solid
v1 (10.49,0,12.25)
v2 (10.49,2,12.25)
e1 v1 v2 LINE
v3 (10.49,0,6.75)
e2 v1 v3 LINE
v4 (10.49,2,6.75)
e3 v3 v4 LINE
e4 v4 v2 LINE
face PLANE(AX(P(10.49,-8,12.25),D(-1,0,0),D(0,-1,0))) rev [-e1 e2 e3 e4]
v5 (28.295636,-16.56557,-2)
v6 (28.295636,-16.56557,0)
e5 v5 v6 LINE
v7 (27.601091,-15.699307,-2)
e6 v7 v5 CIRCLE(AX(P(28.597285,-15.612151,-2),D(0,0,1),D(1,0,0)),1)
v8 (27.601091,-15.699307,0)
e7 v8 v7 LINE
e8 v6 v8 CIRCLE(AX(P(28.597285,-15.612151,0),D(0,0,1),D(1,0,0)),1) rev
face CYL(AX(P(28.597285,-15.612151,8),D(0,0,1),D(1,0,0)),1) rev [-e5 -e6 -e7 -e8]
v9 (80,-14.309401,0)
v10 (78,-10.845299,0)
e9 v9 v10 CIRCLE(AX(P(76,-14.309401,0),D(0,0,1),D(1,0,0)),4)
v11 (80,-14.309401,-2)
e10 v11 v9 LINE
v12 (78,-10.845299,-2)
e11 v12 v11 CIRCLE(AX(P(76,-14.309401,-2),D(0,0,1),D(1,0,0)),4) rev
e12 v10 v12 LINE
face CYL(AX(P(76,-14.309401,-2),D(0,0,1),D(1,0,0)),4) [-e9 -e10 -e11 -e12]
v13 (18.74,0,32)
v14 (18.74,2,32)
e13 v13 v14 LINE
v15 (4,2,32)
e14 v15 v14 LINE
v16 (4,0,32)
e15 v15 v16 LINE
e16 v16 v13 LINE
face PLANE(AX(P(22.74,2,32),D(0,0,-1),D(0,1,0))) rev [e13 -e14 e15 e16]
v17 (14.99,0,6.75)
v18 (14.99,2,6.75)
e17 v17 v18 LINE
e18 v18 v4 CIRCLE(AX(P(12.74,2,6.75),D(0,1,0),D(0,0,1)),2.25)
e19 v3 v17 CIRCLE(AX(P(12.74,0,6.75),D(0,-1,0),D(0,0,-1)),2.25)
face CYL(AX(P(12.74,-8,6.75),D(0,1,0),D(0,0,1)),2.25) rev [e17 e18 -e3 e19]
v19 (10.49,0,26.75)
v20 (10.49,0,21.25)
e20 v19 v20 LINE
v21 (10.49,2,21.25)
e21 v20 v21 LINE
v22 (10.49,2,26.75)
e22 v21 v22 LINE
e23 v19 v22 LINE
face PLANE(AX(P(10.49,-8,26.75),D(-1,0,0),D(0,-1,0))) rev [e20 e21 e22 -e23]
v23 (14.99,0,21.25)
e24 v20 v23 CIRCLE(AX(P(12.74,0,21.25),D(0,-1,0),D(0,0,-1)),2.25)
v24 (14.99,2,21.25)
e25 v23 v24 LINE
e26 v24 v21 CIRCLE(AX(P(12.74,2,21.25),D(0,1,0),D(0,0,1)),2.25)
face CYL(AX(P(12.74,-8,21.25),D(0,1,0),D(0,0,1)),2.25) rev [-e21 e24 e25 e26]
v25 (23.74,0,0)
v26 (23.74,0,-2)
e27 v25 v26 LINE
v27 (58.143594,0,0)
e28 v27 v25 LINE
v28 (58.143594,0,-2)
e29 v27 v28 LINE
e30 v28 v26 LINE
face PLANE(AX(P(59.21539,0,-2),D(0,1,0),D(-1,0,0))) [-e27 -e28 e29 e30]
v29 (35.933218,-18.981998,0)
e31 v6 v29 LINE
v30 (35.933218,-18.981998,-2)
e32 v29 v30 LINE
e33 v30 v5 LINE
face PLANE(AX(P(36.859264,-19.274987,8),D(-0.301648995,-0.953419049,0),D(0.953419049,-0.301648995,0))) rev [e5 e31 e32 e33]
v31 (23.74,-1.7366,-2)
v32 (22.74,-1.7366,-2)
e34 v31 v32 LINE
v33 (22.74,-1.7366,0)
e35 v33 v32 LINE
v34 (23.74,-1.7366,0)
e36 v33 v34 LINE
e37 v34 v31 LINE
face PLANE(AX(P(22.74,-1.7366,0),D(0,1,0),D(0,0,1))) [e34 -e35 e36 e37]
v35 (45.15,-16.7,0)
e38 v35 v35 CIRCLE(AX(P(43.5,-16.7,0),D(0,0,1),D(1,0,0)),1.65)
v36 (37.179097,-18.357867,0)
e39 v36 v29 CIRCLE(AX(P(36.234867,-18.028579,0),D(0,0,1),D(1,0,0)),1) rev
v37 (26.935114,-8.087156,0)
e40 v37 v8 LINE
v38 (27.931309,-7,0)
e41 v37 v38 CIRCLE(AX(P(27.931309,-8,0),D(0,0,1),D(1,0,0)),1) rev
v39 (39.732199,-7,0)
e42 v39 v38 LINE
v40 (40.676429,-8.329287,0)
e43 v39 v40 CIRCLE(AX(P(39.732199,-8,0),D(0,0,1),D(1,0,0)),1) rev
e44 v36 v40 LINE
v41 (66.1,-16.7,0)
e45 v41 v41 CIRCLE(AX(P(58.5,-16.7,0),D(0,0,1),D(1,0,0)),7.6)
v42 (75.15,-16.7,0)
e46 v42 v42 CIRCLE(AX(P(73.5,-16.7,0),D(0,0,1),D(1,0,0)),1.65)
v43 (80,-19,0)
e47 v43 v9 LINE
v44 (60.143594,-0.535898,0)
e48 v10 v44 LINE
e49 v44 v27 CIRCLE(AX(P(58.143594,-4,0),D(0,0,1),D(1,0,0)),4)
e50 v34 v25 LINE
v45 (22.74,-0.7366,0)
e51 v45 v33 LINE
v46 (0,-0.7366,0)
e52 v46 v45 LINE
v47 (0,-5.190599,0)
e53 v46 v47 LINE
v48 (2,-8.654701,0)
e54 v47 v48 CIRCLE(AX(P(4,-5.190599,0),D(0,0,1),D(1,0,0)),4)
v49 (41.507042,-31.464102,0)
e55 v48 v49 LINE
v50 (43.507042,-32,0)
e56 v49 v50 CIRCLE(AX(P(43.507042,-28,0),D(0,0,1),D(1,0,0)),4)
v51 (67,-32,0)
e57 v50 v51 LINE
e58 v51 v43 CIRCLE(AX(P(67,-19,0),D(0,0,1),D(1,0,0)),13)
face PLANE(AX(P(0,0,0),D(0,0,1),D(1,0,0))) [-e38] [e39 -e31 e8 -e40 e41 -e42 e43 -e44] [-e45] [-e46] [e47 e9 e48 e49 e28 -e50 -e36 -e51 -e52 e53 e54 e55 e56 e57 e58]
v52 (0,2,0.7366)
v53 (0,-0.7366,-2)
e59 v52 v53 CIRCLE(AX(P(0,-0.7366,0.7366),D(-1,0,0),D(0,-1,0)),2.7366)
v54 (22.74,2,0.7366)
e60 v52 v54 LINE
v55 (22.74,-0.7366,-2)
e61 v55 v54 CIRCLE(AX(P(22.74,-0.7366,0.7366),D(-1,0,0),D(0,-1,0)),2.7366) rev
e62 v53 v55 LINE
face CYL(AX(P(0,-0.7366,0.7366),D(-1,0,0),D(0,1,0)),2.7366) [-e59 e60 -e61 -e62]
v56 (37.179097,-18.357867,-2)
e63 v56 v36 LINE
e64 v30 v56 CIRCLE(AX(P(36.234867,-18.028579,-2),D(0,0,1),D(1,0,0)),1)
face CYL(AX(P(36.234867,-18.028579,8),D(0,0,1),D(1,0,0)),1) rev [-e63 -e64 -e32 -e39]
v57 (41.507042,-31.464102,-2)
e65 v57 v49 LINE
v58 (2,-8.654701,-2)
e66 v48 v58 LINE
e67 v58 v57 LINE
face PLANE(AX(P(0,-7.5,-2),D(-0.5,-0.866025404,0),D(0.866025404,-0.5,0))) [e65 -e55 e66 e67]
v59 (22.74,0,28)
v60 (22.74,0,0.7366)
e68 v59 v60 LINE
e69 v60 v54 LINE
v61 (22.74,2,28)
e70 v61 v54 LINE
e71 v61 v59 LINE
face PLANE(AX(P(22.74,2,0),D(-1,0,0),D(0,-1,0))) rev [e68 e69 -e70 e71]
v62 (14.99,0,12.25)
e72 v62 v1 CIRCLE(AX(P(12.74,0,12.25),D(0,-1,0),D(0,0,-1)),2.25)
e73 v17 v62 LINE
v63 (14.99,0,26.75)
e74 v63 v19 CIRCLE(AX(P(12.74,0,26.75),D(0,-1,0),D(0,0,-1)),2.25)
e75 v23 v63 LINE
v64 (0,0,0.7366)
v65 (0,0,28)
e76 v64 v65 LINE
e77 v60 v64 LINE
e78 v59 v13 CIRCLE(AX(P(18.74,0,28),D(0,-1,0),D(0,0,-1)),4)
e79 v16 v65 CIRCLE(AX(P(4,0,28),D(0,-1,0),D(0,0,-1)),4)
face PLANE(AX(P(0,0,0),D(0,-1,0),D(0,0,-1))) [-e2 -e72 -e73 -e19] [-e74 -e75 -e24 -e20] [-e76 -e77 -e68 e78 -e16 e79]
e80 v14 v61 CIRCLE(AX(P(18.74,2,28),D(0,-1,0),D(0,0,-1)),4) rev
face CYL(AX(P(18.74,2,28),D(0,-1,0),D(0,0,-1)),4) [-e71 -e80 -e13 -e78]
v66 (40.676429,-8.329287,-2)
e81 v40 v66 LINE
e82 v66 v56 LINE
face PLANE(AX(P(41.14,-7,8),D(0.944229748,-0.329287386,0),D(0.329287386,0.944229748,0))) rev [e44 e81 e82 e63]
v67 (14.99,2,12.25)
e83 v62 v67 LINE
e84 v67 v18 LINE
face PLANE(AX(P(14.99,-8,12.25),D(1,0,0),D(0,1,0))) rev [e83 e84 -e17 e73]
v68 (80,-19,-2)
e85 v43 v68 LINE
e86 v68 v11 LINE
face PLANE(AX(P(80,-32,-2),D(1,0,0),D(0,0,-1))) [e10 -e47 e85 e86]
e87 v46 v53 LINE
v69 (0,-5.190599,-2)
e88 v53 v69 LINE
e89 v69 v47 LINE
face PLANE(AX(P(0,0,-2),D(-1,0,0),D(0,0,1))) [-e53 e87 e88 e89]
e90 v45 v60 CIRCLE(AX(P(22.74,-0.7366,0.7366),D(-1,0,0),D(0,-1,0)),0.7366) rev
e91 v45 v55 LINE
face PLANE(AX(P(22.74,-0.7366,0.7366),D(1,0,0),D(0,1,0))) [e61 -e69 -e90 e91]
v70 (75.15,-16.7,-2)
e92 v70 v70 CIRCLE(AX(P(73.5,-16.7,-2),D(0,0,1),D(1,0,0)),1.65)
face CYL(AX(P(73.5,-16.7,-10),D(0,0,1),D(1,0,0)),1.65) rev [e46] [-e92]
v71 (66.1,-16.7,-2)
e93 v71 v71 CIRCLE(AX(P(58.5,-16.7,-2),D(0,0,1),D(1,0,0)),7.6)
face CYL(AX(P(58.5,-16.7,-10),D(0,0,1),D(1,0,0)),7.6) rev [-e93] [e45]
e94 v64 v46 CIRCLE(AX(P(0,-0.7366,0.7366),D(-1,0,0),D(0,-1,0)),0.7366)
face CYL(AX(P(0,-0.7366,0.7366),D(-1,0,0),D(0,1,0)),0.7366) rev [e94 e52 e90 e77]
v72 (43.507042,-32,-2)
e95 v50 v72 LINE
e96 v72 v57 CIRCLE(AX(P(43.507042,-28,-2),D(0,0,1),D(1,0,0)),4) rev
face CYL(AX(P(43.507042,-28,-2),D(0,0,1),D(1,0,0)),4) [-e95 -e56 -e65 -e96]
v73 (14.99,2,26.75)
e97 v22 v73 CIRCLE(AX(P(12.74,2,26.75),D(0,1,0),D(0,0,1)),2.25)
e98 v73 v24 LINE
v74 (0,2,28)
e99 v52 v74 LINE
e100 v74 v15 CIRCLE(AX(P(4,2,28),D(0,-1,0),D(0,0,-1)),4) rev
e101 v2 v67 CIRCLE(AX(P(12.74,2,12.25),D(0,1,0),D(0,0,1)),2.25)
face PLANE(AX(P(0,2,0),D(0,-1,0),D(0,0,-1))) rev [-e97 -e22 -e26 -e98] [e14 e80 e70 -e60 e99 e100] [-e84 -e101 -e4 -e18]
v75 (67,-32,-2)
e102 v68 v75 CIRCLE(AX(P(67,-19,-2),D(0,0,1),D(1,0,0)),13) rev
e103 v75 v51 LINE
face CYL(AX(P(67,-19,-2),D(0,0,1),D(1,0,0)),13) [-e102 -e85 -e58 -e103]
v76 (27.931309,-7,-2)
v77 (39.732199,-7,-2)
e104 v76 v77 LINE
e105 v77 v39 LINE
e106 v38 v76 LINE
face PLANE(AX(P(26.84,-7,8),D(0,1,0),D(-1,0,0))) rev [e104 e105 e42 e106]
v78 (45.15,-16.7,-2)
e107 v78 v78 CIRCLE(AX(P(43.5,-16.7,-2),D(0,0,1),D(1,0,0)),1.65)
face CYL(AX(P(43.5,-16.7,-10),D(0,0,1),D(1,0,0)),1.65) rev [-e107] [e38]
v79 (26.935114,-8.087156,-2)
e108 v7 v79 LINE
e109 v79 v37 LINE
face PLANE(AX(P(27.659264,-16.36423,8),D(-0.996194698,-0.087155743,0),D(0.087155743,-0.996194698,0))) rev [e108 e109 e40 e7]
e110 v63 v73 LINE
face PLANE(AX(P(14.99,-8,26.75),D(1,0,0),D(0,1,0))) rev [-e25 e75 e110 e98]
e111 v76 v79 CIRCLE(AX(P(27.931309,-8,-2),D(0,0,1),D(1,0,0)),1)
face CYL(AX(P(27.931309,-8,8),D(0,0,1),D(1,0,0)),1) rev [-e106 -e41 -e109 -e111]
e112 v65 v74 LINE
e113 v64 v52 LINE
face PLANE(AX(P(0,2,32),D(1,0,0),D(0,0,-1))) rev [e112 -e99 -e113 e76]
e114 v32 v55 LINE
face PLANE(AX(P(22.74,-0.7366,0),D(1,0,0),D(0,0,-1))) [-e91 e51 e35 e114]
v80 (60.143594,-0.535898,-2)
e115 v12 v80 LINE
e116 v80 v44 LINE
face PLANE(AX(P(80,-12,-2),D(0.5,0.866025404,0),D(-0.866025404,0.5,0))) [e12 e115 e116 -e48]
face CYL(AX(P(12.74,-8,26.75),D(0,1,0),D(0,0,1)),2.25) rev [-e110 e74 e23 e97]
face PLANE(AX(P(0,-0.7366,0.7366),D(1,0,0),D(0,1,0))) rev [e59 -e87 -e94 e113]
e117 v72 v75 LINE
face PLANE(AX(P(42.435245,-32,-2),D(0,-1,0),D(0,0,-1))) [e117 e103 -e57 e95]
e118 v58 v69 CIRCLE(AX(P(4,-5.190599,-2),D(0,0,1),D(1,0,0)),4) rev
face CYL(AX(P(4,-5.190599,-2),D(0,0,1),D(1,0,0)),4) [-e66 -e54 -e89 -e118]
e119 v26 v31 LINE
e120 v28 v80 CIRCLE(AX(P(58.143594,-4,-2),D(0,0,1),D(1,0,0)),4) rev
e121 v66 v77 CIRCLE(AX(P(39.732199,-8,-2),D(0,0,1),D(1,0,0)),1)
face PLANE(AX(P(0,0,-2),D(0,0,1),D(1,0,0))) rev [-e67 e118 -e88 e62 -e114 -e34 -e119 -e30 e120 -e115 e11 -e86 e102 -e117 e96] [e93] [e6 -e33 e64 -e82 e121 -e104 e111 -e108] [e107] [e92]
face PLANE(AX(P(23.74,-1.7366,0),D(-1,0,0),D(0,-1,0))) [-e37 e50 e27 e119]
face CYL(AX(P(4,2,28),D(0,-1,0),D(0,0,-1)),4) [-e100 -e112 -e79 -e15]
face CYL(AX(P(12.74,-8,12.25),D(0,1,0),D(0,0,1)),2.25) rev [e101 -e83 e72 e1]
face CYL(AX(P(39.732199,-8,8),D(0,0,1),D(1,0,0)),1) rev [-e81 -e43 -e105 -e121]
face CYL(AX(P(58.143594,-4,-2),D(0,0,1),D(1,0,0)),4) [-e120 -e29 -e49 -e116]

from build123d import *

# Parameters (mm, degrees)
SM_BASE_FLANGE_1_DEPTH            = 2
SKETCH_6_R                        = 7.6
SKETCH_6_R_2                      = 1.65
CUT_EXTRUDE_1_DEPTH               = 10
SM_EDGE_FLANGE_1_STRIP_W          = 9.4732
SM_EDGE_FLANGE_1_STRIP_H          = 2
SM_EDGE_FLANGE_1_STRIP_CUT_DEPTH  = 22.74
SM_EDGE_FLANGE_1_RELIEF_W         = 10.4732
SM_EDGE_FLANGE_1_RELIEF_H         = 1
SM_EDGE_FLANGE_1_RELIEF_CUT_DEPTH = 2
SM_EDGE_FLANGE_1_DEPTH            = 22.74
CUT_EXTRUDE_2_DEPTH               = 10
FILLET_1_R                        = 4
CUT_EXTRUDE_3_DEPTH               = 10
FILLET_2_R                        = 1
FILLET_3_R                        = 13


# Sheet-metal steps are written as plain solids
with BuildPart() as part:
    # Sketch 1 → 基体-法兰1 (new body)
    with BuildSketch(Plane.XY):
        Polygon((0, 0), (0, -7.5), (42.435244785, -32), (80, -32), (80, -12), (59.215390309, 0), align=None)
    extrude(amount=-SM_BASE_FLANGE_1_DEPTH)

    # 草图6 → 切除-拉伸1 (cut)
    with BuildSketch(Plane.XY):
        with Locations((58.5, -16.7)):
            Circle(SKETCH_6_R)
        with Locations((73.5, -16.7)):
            Circle(SKETCH_6_R_2)
        with Locations((43.5, -16.7)):
            Circle(SKETCH_6_R_2)
    extrude(amount=-CUT_EXTRUDE_1_DEPTH, mode=Mode.SUBTRACT)

    # 边线-法兰1 strip (across the edge) → 边线-法兰1 strip cut (cut)
    with BuildSketch(Plane(origin=(22.74, 0, 0), x_dir=(0, -1, 0), z_dir=(-1, 0, 0))):
        with Locations((-4, -1)):
            Rectangle(SM_EDGE_FLANGE_1_STRIP_W, SM_EDGE_FLANGE_1_STRIP_H)
    extrude(amount=SM_EDGE_FLANGE_1_STRIP_CUT_DEPTH, mode=Mode.SUBTRACT)

    # 边线-法兰1 relief (on the sheet) → 边线-法兰1 relief cut (cut)
    with BuildSketch(Plane(origin=(22.74, -0.7366, 0), x_dir=(0, -1, 0), z_dir=(0, 0, 1))):
        with Locations((-4.2366, 0.5)):
            Rectangle(SM_EDGE_FLANGE_1_RELIEF_W, SM_EDGE_FLANGE_1_RELIEF_H)
    extrude(amount=-SM_EDGE_FLANGE_1_RELIEF_CUT_DEPTH, mode=Mode.SUBTRACT)

    # 边线-法兰1 section (across the edge) → 边线-法兰1 (add)
    with BuildSketch(Plane(origin=(22.74, 0, 0), x_dir=(0, -1, 0), z_dir=(-1, 0, 0))):
        with BuildLine():
            Line((-2, 0.7366), (-2, 32))
            Line((-2, 32), (0, 32))
            Line((0, 32), (0, 0.7366))
            ThreePointArc((0, 0.7366), (0.215745145, 0.215745145), (0.7366, 0))
            Line((0.7366, 0), (0.7366, -2))
            ThreePointArc((0.7366, -2), (-1.198468417, -1.198468417), (-2, 0.7366))
        make_face()
    extrude(amount=SM_EDGE_FLANGE_1_DEPTH)

    # 草图12 → 切除-拉伸2 (cut)
    with BuildSketch(Plane(origin=(0, 2, 0), x_dir=(1, 0, 0), z_dir=(0, 1, 0))):
        with BuildLine():
            Line((10.49, -26.75), (10.49, -21.25))
            ThreePointArc((10.49, -21.25), (12.74, -19), (14.99, -21.25))
            Line((14.99, -21.25), (14.99, -26.75))
            ThreePointArc((14.99, -26.75), (12.74, -29), (10.49, -26.75))
        make_face()
        with BuildLine():
            Line((10.49, -12.25), (10.49, -6.75))
            ThreePointArc((10.49, -6.75), (12.74, -4.5), (14.99, -6.75))
            Line((14.99, -6.75), (14.99, -12.25))
            ThreePointArc((14.99, -12.25), (12.74, -14.5), (10.49, -12.25))
        make_face()
    extrude(amount=-CUT_EXTRUDE_2_DEPTH, mode=Mode.SUBTRACT)

    # 圆角1
    fillet_1_edges = [part.edges().sort_by_distance(p)[0] for p in [
        (59.215390309, 0, -1),
        (80, -12, -1),
        (42.435244785, -32, -1),
        (0, -7.5, -1),
        (22.74, 1, 32),
        (0, 1, 32),
    ]]
    fillet(fillet_1_edges, radius=FILLET_1_R)

    # 草图14 → 切除-拉伸3 (cut)
    with BuildSketch(Plane(origin=(0, 0, -2), x_dir=(-1, 0, 0), z_dir=(0, 0, -1))):
        Polygon((-36.859263982, -19.274986727), (-27.659263982, -16.364230162), (-26.84, -7), (-41.14, -7), align=None)
    extrude(amount=-CUT_EXTRUDE_3_DEPTH, mode=Mode.SUBTRACT)

    # 圆角2
    fillet_2_edges = [part.edges().sort_by_distance(p)[0] for p in [
        (26.84, -7, -1),
        (27.659263982, -16.364230162, -1),
        (36.859263982, -19.274986727, -1),
        (41.14, -7, -1),
    ]]
    fillet(fillet_2_edges, radius=FILLET_2_R)

    # 圆角3
    fillet_3_edges = [part.edges().sort_by_distance(p)[0] for p in [
        (80, -32, -1),
    ]]
    fillet(fillet_3_edges, radius=FILLET_3_R)


solid = part.part
